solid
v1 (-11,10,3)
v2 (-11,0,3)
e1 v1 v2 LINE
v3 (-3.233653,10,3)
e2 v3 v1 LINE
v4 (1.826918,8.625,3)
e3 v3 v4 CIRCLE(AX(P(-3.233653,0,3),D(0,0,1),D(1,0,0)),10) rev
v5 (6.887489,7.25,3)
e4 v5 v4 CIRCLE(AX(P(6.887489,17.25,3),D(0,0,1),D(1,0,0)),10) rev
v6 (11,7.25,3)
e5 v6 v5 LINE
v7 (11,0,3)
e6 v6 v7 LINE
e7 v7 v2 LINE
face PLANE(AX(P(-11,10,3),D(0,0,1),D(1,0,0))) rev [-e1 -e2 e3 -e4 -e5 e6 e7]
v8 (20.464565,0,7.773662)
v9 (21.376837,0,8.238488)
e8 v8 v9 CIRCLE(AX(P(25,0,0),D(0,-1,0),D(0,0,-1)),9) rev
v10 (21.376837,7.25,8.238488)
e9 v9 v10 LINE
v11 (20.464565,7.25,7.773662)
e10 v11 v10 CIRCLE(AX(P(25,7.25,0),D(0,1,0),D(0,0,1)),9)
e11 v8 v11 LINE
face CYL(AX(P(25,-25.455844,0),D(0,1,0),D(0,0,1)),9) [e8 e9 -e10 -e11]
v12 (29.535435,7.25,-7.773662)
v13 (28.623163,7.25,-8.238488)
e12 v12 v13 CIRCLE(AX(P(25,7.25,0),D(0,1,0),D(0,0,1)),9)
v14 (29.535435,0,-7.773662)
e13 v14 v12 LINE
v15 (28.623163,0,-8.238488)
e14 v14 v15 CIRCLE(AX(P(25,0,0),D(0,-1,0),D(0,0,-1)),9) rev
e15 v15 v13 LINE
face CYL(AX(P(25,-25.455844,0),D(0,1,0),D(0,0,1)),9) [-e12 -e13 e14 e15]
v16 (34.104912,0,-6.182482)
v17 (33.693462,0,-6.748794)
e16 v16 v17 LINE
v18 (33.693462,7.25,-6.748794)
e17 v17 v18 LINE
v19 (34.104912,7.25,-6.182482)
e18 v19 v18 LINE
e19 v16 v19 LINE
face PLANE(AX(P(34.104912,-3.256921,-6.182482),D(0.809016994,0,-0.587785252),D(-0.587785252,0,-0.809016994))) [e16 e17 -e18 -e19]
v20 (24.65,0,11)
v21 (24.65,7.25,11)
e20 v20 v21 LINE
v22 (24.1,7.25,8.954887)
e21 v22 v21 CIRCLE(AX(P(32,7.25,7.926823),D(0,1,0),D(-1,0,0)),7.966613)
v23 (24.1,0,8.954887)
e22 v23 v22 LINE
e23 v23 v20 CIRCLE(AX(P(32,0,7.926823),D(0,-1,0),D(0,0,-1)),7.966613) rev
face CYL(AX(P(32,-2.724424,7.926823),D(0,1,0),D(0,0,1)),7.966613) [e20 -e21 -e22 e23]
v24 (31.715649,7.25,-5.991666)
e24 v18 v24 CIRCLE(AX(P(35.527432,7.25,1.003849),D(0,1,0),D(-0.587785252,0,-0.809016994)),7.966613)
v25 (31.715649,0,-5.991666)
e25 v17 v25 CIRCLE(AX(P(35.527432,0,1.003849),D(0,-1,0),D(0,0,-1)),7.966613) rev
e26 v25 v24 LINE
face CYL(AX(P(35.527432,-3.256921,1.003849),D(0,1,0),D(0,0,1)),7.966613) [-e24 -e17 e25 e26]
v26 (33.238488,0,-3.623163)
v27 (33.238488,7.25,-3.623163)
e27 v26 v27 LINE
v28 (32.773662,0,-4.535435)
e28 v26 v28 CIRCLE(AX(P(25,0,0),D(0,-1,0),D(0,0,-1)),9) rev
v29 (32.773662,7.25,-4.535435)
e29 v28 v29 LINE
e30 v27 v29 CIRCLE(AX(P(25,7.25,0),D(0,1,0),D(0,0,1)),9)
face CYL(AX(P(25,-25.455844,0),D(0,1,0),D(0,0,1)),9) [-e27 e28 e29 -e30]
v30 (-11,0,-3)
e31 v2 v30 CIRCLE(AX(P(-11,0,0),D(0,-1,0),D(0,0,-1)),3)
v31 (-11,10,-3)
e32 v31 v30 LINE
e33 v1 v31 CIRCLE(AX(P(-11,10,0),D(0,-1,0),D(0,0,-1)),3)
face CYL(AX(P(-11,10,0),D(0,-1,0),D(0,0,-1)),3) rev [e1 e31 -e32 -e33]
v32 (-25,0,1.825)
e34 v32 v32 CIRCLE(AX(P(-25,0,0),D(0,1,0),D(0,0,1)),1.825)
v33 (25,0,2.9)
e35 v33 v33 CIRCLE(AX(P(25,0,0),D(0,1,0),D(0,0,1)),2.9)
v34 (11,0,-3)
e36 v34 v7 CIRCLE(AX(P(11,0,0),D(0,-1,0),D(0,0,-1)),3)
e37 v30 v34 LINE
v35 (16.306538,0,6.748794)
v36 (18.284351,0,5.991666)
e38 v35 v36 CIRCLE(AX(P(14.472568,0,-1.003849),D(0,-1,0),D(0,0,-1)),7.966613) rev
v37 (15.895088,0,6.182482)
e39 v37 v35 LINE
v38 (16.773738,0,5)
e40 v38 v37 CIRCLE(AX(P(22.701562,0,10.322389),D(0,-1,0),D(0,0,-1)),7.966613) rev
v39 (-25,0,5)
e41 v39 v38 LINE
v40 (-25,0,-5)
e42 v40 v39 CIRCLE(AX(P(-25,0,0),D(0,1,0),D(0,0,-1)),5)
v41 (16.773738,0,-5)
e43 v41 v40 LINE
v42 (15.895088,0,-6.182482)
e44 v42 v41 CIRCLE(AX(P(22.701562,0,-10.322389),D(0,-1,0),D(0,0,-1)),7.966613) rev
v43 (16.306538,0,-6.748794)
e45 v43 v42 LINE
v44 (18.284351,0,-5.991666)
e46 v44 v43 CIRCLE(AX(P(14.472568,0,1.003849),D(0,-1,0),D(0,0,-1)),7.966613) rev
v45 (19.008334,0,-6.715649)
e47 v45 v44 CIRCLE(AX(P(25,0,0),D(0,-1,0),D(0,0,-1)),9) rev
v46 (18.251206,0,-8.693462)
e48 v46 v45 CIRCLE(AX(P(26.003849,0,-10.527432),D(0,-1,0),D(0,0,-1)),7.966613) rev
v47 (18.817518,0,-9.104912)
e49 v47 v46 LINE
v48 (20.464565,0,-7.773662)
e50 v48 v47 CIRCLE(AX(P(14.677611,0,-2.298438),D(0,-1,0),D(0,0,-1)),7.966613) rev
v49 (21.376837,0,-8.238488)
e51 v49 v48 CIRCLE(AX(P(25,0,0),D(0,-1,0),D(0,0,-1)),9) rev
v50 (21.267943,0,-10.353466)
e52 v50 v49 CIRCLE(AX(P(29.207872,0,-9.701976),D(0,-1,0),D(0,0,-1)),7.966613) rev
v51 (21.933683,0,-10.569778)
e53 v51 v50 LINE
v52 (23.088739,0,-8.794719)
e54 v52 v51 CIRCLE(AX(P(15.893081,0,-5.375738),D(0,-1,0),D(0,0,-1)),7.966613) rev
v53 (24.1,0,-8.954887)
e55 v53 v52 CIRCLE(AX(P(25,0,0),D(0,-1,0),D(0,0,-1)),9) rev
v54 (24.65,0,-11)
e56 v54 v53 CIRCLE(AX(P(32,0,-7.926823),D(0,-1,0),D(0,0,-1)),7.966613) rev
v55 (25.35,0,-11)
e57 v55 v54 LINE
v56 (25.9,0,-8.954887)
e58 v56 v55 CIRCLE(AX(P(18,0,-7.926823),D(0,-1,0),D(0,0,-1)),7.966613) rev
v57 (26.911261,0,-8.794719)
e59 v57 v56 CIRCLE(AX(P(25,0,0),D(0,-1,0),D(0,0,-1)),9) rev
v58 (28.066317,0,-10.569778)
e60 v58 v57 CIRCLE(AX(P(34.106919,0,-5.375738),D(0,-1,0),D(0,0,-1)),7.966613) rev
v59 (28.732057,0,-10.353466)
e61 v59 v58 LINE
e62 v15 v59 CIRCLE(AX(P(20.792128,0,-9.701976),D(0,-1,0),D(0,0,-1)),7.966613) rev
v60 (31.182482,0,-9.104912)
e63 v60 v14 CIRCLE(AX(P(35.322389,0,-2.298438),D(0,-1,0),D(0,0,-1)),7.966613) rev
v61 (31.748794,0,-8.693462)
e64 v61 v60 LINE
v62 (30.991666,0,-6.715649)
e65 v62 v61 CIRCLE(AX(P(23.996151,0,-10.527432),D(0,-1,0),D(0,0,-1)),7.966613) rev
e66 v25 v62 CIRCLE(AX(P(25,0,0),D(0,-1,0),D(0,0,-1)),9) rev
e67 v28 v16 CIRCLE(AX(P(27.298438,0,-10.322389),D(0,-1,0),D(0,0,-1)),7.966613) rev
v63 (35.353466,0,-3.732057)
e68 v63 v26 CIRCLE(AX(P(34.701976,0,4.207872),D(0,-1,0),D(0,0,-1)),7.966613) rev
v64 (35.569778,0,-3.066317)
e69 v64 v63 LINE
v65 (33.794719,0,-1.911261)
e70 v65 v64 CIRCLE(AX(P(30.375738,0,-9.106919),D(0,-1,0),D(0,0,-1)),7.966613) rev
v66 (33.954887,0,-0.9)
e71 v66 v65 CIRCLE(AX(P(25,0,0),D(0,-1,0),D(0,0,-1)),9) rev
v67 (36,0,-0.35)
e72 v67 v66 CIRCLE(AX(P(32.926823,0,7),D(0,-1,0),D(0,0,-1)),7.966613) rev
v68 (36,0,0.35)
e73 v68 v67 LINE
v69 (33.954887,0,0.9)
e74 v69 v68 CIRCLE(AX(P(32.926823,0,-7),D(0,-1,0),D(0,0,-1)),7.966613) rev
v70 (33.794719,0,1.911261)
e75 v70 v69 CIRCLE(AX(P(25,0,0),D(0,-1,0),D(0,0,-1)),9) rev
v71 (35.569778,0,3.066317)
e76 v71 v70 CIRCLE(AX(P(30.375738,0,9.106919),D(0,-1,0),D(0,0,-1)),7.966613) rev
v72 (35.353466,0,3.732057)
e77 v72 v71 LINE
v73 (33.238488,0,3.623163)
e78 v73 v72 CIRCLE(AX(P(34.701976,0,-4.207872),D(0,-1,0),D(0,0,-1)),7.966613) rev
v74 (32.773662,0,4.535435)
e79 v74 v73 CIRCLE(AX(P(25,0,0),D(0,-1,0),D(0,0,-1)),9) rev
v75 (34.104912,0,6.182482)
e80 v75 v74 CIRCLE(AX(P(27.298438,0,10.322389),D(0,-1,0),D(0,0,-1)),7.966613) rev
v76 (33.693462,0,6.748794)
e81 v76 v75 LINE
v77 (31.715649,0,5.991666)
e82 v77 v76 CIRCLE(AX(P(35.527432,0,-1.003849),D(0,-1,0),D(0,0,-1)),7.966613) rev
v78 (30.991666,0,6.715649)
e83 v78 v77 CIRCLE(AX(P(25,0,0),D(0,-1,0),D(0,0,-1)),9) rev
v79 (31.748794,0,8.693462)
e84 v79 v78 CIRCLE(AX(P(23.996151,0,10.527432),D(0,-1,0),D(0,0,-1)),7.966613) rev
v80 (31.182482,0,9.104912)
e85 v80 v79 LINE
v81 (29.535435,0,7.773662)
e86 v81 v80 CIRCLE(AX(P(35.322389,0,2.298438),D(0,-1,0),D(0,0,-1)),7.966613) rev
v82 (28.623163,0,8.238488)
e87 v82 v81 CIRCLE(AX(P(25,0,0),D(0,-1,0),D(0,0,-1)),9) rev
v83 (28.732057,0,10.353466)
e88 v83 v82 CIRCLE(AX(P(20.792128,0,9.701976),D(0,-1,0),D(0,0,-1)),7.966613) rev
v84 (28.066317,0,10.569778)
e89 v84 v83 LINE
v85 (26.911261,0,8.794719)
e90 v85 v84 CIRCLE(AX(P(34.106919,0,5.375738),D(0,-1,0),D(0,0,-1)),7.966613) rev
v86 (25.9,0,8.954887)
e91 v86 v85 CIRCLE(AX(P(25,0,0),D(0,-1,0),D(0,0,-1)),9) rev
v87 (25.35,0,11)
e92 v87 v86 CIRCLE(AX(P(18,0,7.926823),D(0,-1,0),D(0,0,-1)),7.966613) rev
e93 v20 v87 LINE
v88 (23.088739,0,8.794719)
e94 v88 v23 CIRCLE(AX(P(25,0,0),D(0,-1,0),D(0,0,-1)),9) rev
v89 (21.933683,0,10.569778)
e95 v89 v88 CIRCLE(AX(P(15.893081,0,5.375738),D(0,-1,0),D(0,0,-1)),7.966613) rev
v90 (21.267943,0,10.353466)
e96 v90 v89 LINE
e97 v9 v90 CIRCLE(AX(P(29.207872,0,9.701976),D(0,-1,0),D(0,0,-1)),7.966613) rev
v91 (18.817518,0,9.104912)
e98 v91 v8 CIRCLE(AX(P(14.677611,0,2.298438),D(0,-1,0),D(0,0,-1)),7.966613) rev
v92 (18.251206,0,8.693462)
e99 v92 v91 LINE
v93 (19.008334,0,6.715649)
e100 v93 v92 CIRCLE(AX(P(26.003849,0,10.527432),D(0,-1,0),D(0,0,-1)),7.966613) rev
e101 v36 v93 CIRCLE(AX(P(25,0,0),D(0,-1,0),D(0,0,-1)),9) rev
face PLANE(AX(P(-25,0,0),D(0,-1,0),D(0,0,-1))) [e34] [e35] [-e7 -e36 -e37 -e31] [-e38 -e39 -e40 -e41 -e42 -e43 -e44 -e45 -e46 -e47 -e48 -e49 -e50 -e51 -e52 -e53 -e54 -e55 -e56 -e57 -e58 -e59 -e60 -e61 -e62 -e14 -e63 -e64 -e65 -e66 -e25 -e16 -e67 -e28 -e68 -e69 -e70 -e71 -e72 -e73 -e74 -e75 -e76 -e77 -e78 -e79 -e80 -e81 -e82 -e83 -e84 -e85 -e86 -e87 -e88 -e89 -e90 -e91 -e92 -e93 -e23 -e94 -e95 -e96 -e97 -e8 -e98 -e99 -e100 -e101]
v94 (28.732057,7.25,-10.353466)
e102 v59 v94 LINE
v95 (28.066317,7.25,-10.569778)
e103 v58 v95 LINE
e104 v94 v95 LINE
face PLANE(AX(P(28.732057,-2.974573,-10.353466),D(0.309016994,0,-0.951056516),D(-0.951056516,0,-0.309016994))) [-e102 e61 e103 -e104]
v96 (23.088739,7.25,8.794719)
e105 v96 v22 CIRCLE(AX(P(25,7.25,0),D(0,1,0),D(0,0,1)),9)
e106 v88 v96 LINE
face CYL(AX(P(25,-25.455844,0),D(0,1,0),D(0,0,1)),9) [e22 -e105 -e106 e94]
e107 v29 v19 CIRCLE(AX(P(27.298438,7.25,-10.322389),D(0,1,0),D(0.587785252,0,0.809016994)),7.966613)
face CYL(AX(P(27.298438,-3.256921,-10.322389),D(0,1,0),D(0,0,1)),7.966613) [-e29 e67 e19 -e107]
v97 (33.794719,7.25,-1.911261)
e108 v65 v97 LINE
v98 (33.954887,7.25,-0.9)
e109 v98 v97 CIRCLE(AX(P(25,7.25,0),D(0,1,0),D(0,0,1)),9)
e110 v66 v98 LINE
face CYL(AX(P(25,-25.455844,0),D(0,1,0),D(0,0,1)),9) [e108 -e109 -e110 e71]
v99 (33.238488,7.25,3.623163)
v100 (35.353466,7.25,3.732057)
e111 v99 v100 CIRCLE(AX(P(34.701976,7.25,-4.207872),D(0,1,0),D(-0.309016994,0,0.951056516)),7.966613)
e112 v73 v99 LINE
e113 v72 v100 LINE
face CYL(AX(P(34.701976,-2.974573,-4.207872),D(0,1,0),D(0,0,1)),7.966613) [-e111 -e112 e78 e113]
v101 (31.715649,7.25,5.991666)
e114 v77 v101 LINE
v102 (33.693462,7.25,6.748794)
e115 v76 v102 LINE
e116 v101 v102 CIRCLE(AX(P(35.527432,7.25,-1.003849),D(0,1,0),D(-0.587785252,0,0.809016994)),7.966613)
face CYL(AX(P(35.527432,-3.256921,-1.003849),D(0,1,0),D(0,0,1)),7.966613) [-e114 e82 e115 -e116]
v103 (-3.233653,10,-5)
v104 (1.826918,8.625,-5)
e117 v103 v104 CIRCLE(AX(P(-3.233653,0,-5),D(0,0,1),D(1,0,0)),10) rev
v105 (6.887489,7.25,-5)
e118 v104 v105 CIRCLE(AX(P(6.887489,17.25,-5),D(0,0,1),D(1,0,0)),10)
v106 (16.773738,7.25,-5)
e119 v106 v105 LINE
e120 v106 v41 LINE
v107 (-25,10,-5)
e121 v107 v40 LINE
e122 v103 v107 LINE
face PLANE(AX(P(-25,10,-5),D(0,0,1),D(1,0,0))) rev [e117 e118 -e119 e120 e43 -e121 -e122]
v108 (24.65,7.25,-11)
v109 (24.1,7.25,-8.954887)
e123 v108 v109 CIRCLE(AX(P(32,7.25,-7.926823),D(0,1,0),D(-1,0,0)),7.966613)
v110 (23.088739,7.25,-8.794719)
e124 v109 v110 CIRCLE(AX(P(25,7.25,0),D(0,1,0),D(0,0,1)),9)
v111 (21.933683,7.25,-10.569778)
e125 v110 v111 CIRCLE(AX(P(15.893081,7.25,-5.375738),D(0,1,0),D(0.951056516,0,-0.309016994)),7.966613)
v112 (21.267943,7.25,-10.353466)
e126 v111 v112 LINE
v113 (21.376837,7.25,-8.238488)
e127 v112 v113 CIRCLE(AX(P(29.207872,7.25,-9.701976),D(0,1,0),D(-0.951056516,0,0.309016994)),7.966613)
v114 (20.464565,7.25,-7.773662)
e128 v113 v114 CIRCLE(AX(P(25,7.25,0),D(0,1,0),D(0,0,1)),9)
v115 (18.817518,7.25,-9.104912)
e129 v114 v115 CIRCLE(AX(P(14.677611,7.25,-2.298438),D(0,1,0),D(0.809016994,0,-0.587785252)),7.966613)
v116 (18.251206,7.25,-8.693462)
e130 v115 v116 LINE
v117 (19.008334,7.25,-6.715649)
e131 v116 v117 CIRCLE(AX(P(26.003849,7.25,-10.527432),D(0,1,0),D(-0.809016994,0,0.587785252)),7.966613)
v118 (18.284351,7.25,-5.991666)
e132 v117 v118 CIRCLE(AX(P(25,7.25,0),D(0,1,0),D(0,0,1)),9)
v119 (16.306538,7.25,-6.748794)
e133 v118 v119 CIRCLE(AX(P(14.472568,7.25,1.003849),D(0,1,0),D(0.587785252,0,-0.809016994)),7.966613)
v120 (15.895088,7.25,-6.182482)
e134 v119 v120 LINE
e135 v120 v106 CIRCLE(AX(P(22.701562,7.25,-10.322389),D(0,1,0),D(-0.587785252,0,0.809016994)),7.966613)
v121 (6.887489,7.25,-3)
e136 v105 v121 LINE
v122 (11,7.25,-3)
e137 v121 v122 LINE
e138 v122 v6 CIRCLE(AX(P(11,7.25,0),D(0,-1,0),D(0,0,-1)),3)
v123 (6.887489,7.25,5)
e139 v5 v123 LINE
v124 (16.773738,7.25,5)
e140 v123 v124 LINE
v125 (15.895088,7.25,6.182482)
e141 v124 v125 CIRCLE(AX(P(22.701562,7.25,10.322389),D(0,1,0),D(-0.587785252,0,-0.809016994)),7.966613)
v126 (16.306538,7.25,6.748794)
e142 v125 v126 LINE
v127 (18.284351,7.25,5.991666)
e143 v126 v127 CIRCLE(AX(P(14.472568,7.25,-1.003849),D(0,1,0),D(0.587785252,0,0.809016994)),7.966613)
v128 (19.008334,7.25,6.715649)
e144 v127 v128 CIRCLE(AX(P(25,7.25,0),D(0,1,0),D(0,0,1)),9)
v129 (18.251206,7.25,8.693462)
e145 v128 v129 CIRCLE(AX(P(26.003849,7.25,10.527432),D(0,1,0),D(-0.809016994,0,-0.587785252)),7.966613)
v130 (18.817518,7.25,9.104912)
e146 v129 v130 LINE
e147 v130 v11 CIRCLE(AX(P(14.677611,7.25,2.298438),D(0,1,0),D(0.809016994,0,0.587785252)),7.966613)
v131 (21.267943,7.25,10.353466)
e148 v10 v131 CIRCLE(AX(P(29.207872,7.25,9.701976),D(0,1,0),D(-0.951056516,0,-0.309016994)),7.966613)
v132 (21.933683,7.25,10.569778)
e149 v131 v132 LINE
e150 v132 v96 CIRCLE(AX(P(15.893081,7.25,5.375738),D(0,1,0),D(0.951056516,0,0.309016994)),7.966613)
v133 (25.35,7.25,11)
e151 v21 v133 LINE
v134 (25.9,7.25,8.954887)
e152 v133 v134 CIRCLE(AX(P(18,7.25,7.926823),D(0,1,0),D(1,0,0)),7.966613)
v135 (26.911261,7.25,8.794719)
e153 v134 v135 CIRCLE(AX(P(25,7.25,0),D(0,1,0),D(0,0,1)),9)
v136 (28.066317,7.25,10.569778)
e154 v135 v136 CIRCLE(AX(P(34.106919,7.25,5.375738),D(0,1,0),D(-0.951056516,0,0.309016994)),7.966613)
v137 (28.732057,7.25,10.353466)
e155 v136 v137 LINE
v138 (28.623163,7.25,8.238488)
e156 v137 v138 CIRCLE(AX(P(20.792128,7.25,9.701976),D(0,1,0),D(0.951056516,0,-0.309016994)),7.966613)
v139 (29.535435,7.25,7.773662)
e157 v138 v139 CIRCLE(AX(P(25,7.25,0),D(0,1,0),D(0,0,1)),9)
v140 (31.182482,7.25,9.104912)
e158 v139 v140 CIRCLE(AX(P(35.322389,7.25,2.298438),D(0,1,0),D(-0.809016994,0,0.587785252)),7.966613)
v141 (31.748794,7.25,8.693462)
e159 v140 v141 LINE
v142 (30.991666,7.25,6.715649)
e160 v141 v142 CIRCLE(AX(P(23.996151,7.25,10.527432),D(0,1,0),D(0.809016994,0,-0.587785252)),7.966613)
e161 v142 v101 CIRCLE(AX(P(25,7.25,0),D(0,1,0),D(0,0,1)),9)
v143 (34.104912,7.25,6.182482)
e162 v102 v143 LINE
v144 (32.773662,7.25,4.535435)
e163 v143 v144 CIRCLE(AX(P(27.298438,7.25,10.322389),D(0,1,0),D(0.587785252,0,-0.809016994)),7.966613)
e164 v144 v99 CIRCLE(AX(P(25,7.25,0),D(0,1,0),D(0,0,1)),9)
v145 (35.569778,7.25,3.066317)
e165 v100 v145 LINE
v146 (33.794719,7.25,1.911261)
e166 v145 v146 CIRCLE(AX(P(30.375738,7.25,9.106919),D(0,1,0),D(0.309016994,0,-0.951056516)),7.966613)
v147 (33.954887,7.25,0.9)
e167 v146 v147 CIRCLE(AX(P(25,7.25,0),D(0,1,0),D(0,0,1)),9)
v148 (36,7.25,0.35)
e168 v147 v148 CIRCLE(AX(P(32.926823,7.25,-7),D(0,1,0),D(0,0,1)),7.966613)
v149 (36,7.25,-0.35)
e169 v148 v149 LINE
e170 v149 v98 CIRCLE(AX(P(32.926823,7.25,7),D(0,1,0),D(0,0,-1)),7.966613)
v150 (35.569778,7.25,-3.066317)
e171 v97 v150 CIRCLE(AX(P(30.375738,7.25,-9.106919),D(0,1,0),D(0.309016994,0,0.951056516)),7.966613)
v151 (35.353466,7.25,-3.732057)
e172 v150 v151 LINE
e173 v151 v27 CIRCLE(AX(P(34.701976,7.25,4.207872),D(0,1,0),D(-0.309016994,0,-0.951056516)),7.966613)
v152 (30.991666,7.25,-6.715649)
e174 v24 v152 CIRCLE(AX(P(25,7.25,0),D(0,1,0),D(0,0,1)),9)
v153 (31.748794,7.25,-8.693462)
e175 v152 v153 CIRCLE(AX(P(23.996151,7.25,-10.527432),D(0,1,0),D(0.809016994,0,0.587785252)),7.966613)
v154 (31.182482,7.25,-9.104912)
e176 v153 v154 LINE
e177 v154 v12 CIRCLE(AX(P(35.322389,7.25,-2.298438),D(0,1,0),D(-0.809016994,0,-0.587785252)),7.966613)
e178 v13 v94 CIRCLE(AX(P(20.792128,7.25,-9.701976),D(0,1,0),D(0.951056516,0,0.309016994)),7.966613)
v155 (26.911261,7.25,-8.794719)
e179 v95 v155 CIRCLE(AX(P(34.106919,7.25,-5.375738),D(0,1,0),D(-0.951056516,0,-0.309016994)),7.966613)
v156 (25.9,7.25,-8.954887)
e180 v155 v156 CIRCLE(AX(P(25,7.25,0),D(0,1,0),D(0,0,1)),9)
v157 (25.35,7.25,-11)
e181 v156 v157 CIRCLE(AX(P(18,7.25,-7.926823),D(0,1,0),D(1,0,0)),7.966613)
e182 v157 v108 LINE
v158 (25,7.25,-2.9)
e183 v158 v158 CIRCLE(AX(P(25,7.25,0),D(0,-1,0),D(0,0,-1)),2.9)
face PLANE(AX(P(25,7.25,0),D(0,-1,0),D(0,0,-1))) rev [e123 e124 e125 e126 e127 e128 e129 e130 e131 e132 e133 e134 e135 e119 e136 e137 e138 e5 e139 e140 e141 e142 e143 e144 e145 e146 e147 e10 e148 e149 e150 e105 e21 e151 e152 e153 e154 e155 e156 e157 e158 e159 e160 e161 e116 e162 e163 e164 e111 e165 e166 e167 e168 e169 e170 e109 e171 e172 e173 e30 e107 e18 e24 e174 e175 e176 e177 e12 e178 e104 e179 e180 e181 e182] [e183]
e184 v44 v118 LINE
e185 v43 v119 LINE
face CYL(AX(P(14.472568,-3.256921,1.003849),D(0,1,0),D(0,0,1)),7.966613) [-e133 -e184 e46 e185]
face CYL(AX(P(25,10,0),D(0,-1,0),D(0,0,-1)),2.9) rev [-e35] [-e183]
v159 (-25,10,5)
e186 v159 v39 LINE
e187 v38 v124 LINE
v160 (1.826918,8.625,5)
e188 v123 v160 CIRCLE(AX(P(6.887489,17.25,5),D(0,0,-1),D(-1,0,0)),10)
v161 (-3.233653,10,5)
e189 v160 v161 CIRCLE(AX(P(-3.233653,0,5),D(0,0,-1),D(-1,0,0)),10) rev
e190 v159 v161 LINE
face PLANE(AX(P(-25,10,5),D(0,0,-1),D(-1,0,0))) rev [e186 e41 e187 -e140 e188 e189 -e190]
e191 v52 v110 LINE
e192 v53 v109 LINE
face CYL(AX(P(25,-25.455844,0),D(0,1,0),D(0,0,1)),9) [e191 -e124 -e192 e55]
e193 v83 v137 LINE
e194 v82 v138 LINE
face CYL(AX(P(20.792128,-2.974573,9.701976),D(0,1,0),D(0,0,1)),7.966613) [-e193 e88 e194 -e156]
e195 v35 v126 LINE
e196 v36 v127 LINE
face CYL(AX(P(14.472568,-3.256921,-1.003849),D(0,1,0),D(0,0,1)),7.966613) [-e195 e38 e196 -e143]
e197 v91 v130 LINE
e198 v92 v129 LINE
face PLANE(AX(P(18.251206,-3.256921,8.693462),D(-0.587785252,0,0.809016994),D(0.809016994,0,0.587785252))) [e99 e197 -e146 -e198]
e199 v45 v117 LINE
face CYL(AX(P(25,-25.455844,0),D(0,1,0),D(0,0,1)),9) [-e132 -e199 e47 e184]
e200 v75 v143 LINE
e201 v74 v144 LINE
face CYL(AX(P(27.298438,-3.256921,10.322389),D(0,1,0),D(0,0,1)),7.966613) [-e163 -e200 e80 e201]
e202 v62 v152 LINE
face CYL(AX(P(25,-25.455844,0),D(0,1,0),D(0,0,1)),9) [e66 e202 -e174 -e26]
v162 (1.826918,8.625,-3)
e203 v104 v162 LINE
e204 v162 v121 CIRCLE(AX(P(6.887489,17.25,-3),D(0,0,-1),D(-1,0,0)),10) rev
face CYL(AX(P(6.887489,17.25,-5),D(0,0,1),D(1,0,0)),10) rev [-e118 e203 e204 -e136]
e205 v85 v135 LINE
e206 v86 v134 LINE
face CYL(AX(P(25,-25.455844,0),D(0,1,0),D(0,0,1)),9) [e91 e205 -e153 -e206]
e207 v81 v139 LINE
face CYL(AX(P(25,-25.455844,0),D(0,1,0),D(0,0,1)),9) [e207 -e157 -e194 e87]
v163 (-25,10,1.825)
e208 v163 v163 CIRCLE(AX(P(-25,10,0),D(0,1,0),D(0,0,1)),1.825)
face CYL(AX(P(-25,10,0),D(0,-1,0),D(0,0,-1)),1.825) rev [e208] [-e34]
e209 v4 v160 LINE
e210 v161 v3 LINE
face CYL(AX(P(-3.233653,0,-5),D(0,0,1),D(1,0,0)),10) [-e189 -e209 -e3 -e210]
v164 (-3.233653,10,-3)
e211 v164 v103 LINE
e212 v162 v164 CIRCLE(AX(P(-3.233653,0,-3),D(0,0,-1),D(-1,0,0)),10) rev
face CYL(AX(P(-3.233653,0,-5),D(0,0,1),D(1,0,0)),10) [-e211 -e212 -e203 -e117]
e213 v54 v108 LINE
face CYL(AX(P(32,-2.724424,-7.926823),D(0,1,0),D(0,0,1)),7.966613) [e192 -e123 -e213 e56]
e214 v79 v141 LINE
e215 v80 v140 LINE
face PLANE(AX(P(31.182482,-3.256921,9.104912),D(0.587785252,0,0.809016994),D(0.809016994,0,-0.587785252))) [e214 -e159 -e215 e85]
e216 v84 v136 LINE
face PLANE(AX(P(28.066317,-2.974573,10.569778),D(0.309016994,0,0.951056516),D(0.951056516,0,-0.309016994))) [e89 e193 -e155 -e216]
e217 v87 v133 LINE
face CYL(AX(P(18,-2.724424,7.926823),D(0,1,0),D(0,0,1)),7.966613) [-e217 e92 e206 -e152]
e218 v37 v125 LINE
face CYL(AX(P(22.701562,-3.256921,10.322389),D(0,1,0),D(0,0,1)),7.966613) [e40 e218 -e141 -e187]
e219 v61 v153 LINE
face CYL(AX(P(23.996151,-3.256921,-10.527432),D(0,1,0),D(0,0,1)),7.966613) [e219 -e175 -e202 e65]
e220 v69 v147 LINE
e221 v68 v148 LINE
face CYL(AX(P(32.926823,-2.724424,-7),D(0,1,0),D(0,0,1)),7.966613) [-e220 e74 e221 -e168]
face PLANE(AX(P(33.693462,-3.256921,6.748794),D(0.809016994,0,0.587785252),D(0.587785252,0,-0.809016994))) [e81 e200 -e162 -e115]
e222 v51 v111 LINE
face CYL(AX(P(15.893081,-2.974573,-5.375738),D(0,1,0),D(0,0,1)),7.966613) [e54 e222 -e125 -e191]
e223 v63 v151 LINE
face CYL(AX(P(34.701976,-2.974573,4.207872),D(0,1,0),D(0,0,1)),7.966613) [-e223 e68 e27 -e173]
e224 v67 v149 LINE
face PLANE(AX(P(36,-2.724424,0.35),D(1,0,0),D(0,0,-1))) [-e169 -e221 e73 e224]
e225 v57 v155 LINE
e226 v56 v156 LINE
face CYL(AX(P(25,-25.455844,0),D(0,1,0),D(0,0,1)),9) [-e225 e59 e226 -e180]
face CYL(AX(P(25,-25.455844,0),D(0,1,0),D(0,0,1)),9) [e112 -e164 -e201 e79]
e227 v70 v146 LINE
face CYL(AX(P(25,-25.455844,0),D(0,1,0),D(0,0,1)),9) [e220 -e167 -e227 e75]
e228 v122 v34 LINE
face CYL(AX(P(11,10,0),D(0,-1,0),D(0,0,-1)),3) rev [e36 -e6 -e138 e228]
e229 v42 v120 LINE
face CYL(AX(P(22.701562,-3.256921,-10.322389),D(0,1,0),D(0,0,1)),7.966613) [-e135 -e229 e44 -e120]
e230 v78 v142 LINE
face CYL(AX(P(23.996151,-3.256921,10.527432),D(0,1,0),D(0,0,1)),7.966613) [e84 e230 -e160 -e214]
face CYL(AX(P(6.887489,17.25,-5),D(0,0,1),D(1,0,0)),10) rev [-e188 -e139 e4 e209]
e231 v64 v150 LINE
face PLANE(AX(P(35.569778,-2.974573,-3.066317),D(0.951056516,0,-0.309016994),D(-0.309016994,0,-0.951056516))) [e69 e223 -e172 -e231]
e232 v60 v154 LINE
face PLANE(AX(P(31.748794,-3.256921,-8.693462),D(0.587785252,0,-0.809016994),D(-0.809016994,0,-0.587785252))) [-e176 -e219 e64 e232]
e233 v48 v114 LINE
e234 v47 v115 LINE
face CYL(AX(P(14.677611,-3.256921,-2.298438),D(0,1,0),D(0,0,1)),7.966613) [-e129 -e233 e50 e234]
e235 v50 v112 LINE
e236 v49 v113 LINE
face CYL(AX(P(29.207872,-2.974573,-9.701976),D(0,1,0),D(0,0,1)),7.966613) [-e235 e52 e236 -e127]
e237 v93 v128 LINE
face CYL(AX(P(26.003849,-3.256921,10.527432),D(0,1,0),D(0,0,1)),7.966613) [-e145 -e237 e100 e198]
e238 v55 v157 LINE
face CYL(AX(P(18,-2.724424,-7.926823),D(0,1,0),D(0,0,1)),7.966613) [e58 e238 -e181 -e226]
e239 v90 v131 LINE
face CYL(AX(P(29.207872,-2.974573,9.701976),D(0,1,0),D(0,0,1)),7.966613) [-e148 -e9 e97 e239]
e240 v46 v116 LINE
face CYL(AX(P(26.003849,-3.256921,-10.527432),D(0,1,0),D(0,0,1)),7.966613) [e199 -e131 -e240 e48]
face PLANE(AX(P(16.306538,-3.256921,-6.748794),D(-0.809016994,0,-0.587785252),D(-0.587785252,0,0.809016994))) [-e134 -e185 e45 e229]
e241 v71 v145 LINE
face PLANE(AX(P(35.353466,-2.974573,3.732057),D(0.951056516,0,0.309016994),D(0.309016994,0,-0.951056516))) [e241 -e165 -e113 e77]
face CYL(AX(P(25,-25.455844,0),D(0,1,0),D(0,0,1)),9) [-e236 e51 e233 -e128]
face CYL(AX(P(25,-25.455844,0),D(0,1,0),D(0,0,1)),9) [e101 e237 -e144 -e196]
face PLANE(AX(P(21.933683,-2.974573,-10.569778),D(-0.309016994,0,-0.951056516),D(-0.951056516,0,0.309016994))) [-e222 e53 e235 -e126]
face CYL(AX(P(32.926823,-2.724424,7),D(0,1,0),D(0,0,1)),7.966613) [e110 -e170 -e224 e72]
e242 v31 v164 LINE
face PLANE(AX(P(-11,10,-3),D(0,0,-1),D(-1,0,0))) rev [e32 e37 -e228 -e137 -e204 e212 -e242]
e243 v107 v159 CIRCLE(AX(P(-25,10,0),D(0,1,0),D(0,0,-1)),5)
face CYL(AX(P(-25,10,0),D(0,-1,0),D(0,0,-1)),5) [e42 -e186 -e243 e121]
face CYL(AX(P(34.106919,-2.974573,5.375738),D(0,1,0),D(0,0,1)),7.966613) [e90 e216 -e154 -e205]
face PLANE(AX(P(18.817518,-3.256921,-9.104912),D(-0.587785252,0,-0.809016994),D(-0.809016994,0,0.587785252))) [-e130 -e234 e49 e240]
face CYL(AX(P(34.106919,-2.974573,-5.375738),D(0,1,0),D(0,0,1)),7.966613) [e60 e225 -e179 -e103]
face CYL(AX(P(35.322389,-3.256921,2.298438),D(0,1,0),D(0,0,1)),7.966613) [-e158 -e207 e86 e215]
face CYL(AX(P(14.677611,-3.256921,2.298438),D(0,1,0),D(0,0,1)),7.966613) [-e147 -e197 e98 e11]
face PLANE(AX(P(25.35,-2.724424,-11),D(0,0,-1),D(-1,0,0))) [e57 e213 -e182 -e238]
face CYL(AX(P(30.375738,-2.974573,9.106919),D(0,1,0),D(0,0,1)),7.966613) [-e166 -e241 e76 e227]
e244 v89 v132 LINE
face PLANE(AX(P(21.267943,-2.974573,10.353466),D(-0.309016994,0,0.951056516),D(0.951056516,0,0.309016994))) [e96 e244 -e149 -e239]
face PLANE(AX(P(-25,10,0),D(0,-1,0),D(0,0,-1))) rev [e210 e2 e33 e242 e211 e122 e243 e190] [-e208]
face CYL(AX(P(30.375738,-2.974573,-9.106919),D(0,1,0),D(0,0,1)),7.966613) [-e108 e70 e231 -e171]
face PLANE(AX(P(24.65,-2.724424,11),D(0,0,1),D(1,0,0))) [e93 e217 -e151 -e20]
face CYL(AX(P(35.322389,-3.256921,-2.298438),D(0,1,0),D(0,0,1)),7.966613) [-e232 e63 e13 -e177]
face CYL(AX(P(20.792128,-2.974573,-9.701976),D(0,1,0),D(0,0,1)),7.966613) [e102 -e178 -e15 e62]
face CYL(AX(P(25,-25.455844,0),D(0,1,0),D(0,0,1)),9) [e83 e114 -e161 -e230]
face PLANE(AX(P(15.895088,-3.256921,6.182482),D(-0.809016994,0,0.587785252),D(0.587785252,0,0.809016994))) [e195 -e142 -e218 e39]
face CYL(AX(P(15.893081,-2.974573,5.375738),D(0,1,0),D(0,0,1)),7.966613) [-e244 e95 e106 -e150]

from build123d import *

# Parameters (mm, degrees)
SKIZZE2_R                       = 1.825
SKIZZE2_R_2                     = 2.9
AUFSATZ_LINEAR_AUSTRAGEN1_DEPTH = 10
SCHNITT_LINEAR_START            = -2.75
SCHNITT_LINEAR_AUSTRAGEN1_DEPTH = 2.75
VERRUNDUNG1_R                   = 10
VERRUNDUNG2_R                   = 10
AUFSATZ_LINEAR_START            = -7.25
SKIZZE5_R                       = 9
SKIZZE5_R_2                     = 5
AUFSATZ_LINEAR_AUSTRAGEN2_DEPTH = 7.25
AUFSATZ_LINEAR_AUSTRAGEN3_DEPTH = 7.25
KREISMUSTER1_COUNT              = 20
SCHNITT_LINEAR_AUSTRAGEN3_DEPTH = 39.948684188


with BuildPart() as part:
    # Skizze2 → Aufsatz-Linear austragen1 (new body)
    with BuildSketch(Plane(origin=(0, 0, 0), x_dir=(1, 0, 0), z_dir=(0, 1, 0))):
        with BuildLine():
            Line((-25, 5), (25, 5))
            ThreePointArc((25, 5), (30, 0), (25, -5))
            Line((25, -5), (-25, -5))
            ThreePointArc((-25, -5), (-30, 0), (-25, 5))
        make_face()
        with Locations(Location((-25, 0, 0), (0, 0, 270))):
            Circle(SKIZZE2_R, mode=Mode.SUBTRACT)
        with Locations(Location((25, 0, 0), (0, 0, 270))):
            Circle(SKIZZE2_R_2, mode=Mode.SUBTRACT)
    extrude(amount=AUFSATZ_LINEAR_AUSTRAGEN1_DEPTH)

    # Skizze4 → Schnitt-Linear austragen1 (cut)
    with BuildSketch(Plane(origin=(0, 10, 0), x_dir=(1, 0, 0), z_dir=(0, 1, 0)).offset(SCHNITT_LINEAR_START)):
        with BuildLine():
            Line((25, 5), (0, 5))
            Line((0, 5), (0, -5))
            Line((0, -5), (25, -5))
            ThreePointArc((25, -5), (30, 0), (25, 5))
        make_face()
    extrude(amount=SCHNITT_LINEAR_AUSTRAGEN1_DEPTH, mode=Mode.SUBTRACT)

    # Verrundung1
    # the kernel refuses this fillet: 10 mm, written as the material it adds along each edge
    with BuildSketch(Plane(origin=(0, 7.25, -5), x_dir=(1, 0, 0), z_dir=(0, 0, 1))) as verrundung1_piece_1:
        with BuildLine():
            CenterArc((6.887488657, 10), VERRUNDUNG1_R, 226.468847833, 43.531152167)
            Line((0, 2.75), (-0.137749773, 2.605))
            ThreePointArc((-0.137749773, 2.605), (-0.2, 1.375), (-0.2, 0))
            Line((-0.2, 0), (0, -0.2))
            Line((0, -0.2), (6.887488657, -0.2))
            Line((6.887488657, -0.2), (6.887488657, 0))
        make_face()
    extrude(amount=10)

    # Verrundung2
    verrundung2_edges = [part.edges().sort_by_distance(p)[0] for p in [
        (0, 10, 0),
    ]]
    fillet(verrundung2_edges, radius=VERRUNDUNG2_R)

    # Skizze5 → Aufsatz-Linear austragen2 (add)
    with BuildSketch(Plane(origin=(0, 7.25, 0), x_dir=(1, 0, 0), z_dir=(0, 1, 0)).offset(AUFSATZ_LINEAR_START)):
        with Locations((25, 0)):
            Circle(SKIZZE5_R)
        with Locations((25, 0)):
            Circle(SKIZZE5_R_2, mode=Mode.SUBTRACT)
    extrude(amount=AUFSATZ_LINEAR_AUSTRAGEN2_DEPTH)

    # Skizze6 → Aufsatz-Linear austragen3 (add)
    with BuildSketch(Plane(origin=(0, 7.25, 0), x_dir=(1, 0, 0), z_dir=(0, 1, 0)).offset(AUFSATZ_LINEAR_START)):
        with BuildLine():
            Line((36, -0.35), (36, 0.35))
            ThreePointArc((36, 0.35), (34.995800842, 0.693259833), (33.954886934, 0.9))
            ThreePointArc((33.954886934, 0.9), (34, 0), (33.954886934, -0.9))
            ThreePointArc((33.954886934, -0.9), (34.995800842, -0.693259833), (36, -0.35))
        make_face()
    aufsatz_linear_austragen3 = extrude(amount=AUFSATZ_LINEAR_AUSTRAGEN3_DEPTH)

    # Kreismuster1: Aufsatz-Linear austragen3 ×20 about axis
    kreismuster1_axis = Axis((25, 0, 0), (0, 1, 0))
    for i in range(1, KREISMUSTER1_COUNT):
        add(aufsatz_linear_austragen3.rotate(kreismuster1_axis, i * 360 / KREISMUSTER1_COUNT))

    # Skizze9 → Schnitt-Linear austragen3 (cut, through all)
    with BuildSketch(Plane.XZ):
        with BuildLine():
            Line((-11, 3), (11, 3))
            ThreePointArc((11, 3), (14, 0), (11, -3))
            Line((11, -3), (-11, -3))
            ThreePointArc((-11, -3), (-14, 0), (-11, 3))
        make_face()
    extrude(amount=-SCHNITT_LINEAR_AUSTRAGEN3_DEPTH, mode=Mode.SUBTRACT)


solid = part.part
